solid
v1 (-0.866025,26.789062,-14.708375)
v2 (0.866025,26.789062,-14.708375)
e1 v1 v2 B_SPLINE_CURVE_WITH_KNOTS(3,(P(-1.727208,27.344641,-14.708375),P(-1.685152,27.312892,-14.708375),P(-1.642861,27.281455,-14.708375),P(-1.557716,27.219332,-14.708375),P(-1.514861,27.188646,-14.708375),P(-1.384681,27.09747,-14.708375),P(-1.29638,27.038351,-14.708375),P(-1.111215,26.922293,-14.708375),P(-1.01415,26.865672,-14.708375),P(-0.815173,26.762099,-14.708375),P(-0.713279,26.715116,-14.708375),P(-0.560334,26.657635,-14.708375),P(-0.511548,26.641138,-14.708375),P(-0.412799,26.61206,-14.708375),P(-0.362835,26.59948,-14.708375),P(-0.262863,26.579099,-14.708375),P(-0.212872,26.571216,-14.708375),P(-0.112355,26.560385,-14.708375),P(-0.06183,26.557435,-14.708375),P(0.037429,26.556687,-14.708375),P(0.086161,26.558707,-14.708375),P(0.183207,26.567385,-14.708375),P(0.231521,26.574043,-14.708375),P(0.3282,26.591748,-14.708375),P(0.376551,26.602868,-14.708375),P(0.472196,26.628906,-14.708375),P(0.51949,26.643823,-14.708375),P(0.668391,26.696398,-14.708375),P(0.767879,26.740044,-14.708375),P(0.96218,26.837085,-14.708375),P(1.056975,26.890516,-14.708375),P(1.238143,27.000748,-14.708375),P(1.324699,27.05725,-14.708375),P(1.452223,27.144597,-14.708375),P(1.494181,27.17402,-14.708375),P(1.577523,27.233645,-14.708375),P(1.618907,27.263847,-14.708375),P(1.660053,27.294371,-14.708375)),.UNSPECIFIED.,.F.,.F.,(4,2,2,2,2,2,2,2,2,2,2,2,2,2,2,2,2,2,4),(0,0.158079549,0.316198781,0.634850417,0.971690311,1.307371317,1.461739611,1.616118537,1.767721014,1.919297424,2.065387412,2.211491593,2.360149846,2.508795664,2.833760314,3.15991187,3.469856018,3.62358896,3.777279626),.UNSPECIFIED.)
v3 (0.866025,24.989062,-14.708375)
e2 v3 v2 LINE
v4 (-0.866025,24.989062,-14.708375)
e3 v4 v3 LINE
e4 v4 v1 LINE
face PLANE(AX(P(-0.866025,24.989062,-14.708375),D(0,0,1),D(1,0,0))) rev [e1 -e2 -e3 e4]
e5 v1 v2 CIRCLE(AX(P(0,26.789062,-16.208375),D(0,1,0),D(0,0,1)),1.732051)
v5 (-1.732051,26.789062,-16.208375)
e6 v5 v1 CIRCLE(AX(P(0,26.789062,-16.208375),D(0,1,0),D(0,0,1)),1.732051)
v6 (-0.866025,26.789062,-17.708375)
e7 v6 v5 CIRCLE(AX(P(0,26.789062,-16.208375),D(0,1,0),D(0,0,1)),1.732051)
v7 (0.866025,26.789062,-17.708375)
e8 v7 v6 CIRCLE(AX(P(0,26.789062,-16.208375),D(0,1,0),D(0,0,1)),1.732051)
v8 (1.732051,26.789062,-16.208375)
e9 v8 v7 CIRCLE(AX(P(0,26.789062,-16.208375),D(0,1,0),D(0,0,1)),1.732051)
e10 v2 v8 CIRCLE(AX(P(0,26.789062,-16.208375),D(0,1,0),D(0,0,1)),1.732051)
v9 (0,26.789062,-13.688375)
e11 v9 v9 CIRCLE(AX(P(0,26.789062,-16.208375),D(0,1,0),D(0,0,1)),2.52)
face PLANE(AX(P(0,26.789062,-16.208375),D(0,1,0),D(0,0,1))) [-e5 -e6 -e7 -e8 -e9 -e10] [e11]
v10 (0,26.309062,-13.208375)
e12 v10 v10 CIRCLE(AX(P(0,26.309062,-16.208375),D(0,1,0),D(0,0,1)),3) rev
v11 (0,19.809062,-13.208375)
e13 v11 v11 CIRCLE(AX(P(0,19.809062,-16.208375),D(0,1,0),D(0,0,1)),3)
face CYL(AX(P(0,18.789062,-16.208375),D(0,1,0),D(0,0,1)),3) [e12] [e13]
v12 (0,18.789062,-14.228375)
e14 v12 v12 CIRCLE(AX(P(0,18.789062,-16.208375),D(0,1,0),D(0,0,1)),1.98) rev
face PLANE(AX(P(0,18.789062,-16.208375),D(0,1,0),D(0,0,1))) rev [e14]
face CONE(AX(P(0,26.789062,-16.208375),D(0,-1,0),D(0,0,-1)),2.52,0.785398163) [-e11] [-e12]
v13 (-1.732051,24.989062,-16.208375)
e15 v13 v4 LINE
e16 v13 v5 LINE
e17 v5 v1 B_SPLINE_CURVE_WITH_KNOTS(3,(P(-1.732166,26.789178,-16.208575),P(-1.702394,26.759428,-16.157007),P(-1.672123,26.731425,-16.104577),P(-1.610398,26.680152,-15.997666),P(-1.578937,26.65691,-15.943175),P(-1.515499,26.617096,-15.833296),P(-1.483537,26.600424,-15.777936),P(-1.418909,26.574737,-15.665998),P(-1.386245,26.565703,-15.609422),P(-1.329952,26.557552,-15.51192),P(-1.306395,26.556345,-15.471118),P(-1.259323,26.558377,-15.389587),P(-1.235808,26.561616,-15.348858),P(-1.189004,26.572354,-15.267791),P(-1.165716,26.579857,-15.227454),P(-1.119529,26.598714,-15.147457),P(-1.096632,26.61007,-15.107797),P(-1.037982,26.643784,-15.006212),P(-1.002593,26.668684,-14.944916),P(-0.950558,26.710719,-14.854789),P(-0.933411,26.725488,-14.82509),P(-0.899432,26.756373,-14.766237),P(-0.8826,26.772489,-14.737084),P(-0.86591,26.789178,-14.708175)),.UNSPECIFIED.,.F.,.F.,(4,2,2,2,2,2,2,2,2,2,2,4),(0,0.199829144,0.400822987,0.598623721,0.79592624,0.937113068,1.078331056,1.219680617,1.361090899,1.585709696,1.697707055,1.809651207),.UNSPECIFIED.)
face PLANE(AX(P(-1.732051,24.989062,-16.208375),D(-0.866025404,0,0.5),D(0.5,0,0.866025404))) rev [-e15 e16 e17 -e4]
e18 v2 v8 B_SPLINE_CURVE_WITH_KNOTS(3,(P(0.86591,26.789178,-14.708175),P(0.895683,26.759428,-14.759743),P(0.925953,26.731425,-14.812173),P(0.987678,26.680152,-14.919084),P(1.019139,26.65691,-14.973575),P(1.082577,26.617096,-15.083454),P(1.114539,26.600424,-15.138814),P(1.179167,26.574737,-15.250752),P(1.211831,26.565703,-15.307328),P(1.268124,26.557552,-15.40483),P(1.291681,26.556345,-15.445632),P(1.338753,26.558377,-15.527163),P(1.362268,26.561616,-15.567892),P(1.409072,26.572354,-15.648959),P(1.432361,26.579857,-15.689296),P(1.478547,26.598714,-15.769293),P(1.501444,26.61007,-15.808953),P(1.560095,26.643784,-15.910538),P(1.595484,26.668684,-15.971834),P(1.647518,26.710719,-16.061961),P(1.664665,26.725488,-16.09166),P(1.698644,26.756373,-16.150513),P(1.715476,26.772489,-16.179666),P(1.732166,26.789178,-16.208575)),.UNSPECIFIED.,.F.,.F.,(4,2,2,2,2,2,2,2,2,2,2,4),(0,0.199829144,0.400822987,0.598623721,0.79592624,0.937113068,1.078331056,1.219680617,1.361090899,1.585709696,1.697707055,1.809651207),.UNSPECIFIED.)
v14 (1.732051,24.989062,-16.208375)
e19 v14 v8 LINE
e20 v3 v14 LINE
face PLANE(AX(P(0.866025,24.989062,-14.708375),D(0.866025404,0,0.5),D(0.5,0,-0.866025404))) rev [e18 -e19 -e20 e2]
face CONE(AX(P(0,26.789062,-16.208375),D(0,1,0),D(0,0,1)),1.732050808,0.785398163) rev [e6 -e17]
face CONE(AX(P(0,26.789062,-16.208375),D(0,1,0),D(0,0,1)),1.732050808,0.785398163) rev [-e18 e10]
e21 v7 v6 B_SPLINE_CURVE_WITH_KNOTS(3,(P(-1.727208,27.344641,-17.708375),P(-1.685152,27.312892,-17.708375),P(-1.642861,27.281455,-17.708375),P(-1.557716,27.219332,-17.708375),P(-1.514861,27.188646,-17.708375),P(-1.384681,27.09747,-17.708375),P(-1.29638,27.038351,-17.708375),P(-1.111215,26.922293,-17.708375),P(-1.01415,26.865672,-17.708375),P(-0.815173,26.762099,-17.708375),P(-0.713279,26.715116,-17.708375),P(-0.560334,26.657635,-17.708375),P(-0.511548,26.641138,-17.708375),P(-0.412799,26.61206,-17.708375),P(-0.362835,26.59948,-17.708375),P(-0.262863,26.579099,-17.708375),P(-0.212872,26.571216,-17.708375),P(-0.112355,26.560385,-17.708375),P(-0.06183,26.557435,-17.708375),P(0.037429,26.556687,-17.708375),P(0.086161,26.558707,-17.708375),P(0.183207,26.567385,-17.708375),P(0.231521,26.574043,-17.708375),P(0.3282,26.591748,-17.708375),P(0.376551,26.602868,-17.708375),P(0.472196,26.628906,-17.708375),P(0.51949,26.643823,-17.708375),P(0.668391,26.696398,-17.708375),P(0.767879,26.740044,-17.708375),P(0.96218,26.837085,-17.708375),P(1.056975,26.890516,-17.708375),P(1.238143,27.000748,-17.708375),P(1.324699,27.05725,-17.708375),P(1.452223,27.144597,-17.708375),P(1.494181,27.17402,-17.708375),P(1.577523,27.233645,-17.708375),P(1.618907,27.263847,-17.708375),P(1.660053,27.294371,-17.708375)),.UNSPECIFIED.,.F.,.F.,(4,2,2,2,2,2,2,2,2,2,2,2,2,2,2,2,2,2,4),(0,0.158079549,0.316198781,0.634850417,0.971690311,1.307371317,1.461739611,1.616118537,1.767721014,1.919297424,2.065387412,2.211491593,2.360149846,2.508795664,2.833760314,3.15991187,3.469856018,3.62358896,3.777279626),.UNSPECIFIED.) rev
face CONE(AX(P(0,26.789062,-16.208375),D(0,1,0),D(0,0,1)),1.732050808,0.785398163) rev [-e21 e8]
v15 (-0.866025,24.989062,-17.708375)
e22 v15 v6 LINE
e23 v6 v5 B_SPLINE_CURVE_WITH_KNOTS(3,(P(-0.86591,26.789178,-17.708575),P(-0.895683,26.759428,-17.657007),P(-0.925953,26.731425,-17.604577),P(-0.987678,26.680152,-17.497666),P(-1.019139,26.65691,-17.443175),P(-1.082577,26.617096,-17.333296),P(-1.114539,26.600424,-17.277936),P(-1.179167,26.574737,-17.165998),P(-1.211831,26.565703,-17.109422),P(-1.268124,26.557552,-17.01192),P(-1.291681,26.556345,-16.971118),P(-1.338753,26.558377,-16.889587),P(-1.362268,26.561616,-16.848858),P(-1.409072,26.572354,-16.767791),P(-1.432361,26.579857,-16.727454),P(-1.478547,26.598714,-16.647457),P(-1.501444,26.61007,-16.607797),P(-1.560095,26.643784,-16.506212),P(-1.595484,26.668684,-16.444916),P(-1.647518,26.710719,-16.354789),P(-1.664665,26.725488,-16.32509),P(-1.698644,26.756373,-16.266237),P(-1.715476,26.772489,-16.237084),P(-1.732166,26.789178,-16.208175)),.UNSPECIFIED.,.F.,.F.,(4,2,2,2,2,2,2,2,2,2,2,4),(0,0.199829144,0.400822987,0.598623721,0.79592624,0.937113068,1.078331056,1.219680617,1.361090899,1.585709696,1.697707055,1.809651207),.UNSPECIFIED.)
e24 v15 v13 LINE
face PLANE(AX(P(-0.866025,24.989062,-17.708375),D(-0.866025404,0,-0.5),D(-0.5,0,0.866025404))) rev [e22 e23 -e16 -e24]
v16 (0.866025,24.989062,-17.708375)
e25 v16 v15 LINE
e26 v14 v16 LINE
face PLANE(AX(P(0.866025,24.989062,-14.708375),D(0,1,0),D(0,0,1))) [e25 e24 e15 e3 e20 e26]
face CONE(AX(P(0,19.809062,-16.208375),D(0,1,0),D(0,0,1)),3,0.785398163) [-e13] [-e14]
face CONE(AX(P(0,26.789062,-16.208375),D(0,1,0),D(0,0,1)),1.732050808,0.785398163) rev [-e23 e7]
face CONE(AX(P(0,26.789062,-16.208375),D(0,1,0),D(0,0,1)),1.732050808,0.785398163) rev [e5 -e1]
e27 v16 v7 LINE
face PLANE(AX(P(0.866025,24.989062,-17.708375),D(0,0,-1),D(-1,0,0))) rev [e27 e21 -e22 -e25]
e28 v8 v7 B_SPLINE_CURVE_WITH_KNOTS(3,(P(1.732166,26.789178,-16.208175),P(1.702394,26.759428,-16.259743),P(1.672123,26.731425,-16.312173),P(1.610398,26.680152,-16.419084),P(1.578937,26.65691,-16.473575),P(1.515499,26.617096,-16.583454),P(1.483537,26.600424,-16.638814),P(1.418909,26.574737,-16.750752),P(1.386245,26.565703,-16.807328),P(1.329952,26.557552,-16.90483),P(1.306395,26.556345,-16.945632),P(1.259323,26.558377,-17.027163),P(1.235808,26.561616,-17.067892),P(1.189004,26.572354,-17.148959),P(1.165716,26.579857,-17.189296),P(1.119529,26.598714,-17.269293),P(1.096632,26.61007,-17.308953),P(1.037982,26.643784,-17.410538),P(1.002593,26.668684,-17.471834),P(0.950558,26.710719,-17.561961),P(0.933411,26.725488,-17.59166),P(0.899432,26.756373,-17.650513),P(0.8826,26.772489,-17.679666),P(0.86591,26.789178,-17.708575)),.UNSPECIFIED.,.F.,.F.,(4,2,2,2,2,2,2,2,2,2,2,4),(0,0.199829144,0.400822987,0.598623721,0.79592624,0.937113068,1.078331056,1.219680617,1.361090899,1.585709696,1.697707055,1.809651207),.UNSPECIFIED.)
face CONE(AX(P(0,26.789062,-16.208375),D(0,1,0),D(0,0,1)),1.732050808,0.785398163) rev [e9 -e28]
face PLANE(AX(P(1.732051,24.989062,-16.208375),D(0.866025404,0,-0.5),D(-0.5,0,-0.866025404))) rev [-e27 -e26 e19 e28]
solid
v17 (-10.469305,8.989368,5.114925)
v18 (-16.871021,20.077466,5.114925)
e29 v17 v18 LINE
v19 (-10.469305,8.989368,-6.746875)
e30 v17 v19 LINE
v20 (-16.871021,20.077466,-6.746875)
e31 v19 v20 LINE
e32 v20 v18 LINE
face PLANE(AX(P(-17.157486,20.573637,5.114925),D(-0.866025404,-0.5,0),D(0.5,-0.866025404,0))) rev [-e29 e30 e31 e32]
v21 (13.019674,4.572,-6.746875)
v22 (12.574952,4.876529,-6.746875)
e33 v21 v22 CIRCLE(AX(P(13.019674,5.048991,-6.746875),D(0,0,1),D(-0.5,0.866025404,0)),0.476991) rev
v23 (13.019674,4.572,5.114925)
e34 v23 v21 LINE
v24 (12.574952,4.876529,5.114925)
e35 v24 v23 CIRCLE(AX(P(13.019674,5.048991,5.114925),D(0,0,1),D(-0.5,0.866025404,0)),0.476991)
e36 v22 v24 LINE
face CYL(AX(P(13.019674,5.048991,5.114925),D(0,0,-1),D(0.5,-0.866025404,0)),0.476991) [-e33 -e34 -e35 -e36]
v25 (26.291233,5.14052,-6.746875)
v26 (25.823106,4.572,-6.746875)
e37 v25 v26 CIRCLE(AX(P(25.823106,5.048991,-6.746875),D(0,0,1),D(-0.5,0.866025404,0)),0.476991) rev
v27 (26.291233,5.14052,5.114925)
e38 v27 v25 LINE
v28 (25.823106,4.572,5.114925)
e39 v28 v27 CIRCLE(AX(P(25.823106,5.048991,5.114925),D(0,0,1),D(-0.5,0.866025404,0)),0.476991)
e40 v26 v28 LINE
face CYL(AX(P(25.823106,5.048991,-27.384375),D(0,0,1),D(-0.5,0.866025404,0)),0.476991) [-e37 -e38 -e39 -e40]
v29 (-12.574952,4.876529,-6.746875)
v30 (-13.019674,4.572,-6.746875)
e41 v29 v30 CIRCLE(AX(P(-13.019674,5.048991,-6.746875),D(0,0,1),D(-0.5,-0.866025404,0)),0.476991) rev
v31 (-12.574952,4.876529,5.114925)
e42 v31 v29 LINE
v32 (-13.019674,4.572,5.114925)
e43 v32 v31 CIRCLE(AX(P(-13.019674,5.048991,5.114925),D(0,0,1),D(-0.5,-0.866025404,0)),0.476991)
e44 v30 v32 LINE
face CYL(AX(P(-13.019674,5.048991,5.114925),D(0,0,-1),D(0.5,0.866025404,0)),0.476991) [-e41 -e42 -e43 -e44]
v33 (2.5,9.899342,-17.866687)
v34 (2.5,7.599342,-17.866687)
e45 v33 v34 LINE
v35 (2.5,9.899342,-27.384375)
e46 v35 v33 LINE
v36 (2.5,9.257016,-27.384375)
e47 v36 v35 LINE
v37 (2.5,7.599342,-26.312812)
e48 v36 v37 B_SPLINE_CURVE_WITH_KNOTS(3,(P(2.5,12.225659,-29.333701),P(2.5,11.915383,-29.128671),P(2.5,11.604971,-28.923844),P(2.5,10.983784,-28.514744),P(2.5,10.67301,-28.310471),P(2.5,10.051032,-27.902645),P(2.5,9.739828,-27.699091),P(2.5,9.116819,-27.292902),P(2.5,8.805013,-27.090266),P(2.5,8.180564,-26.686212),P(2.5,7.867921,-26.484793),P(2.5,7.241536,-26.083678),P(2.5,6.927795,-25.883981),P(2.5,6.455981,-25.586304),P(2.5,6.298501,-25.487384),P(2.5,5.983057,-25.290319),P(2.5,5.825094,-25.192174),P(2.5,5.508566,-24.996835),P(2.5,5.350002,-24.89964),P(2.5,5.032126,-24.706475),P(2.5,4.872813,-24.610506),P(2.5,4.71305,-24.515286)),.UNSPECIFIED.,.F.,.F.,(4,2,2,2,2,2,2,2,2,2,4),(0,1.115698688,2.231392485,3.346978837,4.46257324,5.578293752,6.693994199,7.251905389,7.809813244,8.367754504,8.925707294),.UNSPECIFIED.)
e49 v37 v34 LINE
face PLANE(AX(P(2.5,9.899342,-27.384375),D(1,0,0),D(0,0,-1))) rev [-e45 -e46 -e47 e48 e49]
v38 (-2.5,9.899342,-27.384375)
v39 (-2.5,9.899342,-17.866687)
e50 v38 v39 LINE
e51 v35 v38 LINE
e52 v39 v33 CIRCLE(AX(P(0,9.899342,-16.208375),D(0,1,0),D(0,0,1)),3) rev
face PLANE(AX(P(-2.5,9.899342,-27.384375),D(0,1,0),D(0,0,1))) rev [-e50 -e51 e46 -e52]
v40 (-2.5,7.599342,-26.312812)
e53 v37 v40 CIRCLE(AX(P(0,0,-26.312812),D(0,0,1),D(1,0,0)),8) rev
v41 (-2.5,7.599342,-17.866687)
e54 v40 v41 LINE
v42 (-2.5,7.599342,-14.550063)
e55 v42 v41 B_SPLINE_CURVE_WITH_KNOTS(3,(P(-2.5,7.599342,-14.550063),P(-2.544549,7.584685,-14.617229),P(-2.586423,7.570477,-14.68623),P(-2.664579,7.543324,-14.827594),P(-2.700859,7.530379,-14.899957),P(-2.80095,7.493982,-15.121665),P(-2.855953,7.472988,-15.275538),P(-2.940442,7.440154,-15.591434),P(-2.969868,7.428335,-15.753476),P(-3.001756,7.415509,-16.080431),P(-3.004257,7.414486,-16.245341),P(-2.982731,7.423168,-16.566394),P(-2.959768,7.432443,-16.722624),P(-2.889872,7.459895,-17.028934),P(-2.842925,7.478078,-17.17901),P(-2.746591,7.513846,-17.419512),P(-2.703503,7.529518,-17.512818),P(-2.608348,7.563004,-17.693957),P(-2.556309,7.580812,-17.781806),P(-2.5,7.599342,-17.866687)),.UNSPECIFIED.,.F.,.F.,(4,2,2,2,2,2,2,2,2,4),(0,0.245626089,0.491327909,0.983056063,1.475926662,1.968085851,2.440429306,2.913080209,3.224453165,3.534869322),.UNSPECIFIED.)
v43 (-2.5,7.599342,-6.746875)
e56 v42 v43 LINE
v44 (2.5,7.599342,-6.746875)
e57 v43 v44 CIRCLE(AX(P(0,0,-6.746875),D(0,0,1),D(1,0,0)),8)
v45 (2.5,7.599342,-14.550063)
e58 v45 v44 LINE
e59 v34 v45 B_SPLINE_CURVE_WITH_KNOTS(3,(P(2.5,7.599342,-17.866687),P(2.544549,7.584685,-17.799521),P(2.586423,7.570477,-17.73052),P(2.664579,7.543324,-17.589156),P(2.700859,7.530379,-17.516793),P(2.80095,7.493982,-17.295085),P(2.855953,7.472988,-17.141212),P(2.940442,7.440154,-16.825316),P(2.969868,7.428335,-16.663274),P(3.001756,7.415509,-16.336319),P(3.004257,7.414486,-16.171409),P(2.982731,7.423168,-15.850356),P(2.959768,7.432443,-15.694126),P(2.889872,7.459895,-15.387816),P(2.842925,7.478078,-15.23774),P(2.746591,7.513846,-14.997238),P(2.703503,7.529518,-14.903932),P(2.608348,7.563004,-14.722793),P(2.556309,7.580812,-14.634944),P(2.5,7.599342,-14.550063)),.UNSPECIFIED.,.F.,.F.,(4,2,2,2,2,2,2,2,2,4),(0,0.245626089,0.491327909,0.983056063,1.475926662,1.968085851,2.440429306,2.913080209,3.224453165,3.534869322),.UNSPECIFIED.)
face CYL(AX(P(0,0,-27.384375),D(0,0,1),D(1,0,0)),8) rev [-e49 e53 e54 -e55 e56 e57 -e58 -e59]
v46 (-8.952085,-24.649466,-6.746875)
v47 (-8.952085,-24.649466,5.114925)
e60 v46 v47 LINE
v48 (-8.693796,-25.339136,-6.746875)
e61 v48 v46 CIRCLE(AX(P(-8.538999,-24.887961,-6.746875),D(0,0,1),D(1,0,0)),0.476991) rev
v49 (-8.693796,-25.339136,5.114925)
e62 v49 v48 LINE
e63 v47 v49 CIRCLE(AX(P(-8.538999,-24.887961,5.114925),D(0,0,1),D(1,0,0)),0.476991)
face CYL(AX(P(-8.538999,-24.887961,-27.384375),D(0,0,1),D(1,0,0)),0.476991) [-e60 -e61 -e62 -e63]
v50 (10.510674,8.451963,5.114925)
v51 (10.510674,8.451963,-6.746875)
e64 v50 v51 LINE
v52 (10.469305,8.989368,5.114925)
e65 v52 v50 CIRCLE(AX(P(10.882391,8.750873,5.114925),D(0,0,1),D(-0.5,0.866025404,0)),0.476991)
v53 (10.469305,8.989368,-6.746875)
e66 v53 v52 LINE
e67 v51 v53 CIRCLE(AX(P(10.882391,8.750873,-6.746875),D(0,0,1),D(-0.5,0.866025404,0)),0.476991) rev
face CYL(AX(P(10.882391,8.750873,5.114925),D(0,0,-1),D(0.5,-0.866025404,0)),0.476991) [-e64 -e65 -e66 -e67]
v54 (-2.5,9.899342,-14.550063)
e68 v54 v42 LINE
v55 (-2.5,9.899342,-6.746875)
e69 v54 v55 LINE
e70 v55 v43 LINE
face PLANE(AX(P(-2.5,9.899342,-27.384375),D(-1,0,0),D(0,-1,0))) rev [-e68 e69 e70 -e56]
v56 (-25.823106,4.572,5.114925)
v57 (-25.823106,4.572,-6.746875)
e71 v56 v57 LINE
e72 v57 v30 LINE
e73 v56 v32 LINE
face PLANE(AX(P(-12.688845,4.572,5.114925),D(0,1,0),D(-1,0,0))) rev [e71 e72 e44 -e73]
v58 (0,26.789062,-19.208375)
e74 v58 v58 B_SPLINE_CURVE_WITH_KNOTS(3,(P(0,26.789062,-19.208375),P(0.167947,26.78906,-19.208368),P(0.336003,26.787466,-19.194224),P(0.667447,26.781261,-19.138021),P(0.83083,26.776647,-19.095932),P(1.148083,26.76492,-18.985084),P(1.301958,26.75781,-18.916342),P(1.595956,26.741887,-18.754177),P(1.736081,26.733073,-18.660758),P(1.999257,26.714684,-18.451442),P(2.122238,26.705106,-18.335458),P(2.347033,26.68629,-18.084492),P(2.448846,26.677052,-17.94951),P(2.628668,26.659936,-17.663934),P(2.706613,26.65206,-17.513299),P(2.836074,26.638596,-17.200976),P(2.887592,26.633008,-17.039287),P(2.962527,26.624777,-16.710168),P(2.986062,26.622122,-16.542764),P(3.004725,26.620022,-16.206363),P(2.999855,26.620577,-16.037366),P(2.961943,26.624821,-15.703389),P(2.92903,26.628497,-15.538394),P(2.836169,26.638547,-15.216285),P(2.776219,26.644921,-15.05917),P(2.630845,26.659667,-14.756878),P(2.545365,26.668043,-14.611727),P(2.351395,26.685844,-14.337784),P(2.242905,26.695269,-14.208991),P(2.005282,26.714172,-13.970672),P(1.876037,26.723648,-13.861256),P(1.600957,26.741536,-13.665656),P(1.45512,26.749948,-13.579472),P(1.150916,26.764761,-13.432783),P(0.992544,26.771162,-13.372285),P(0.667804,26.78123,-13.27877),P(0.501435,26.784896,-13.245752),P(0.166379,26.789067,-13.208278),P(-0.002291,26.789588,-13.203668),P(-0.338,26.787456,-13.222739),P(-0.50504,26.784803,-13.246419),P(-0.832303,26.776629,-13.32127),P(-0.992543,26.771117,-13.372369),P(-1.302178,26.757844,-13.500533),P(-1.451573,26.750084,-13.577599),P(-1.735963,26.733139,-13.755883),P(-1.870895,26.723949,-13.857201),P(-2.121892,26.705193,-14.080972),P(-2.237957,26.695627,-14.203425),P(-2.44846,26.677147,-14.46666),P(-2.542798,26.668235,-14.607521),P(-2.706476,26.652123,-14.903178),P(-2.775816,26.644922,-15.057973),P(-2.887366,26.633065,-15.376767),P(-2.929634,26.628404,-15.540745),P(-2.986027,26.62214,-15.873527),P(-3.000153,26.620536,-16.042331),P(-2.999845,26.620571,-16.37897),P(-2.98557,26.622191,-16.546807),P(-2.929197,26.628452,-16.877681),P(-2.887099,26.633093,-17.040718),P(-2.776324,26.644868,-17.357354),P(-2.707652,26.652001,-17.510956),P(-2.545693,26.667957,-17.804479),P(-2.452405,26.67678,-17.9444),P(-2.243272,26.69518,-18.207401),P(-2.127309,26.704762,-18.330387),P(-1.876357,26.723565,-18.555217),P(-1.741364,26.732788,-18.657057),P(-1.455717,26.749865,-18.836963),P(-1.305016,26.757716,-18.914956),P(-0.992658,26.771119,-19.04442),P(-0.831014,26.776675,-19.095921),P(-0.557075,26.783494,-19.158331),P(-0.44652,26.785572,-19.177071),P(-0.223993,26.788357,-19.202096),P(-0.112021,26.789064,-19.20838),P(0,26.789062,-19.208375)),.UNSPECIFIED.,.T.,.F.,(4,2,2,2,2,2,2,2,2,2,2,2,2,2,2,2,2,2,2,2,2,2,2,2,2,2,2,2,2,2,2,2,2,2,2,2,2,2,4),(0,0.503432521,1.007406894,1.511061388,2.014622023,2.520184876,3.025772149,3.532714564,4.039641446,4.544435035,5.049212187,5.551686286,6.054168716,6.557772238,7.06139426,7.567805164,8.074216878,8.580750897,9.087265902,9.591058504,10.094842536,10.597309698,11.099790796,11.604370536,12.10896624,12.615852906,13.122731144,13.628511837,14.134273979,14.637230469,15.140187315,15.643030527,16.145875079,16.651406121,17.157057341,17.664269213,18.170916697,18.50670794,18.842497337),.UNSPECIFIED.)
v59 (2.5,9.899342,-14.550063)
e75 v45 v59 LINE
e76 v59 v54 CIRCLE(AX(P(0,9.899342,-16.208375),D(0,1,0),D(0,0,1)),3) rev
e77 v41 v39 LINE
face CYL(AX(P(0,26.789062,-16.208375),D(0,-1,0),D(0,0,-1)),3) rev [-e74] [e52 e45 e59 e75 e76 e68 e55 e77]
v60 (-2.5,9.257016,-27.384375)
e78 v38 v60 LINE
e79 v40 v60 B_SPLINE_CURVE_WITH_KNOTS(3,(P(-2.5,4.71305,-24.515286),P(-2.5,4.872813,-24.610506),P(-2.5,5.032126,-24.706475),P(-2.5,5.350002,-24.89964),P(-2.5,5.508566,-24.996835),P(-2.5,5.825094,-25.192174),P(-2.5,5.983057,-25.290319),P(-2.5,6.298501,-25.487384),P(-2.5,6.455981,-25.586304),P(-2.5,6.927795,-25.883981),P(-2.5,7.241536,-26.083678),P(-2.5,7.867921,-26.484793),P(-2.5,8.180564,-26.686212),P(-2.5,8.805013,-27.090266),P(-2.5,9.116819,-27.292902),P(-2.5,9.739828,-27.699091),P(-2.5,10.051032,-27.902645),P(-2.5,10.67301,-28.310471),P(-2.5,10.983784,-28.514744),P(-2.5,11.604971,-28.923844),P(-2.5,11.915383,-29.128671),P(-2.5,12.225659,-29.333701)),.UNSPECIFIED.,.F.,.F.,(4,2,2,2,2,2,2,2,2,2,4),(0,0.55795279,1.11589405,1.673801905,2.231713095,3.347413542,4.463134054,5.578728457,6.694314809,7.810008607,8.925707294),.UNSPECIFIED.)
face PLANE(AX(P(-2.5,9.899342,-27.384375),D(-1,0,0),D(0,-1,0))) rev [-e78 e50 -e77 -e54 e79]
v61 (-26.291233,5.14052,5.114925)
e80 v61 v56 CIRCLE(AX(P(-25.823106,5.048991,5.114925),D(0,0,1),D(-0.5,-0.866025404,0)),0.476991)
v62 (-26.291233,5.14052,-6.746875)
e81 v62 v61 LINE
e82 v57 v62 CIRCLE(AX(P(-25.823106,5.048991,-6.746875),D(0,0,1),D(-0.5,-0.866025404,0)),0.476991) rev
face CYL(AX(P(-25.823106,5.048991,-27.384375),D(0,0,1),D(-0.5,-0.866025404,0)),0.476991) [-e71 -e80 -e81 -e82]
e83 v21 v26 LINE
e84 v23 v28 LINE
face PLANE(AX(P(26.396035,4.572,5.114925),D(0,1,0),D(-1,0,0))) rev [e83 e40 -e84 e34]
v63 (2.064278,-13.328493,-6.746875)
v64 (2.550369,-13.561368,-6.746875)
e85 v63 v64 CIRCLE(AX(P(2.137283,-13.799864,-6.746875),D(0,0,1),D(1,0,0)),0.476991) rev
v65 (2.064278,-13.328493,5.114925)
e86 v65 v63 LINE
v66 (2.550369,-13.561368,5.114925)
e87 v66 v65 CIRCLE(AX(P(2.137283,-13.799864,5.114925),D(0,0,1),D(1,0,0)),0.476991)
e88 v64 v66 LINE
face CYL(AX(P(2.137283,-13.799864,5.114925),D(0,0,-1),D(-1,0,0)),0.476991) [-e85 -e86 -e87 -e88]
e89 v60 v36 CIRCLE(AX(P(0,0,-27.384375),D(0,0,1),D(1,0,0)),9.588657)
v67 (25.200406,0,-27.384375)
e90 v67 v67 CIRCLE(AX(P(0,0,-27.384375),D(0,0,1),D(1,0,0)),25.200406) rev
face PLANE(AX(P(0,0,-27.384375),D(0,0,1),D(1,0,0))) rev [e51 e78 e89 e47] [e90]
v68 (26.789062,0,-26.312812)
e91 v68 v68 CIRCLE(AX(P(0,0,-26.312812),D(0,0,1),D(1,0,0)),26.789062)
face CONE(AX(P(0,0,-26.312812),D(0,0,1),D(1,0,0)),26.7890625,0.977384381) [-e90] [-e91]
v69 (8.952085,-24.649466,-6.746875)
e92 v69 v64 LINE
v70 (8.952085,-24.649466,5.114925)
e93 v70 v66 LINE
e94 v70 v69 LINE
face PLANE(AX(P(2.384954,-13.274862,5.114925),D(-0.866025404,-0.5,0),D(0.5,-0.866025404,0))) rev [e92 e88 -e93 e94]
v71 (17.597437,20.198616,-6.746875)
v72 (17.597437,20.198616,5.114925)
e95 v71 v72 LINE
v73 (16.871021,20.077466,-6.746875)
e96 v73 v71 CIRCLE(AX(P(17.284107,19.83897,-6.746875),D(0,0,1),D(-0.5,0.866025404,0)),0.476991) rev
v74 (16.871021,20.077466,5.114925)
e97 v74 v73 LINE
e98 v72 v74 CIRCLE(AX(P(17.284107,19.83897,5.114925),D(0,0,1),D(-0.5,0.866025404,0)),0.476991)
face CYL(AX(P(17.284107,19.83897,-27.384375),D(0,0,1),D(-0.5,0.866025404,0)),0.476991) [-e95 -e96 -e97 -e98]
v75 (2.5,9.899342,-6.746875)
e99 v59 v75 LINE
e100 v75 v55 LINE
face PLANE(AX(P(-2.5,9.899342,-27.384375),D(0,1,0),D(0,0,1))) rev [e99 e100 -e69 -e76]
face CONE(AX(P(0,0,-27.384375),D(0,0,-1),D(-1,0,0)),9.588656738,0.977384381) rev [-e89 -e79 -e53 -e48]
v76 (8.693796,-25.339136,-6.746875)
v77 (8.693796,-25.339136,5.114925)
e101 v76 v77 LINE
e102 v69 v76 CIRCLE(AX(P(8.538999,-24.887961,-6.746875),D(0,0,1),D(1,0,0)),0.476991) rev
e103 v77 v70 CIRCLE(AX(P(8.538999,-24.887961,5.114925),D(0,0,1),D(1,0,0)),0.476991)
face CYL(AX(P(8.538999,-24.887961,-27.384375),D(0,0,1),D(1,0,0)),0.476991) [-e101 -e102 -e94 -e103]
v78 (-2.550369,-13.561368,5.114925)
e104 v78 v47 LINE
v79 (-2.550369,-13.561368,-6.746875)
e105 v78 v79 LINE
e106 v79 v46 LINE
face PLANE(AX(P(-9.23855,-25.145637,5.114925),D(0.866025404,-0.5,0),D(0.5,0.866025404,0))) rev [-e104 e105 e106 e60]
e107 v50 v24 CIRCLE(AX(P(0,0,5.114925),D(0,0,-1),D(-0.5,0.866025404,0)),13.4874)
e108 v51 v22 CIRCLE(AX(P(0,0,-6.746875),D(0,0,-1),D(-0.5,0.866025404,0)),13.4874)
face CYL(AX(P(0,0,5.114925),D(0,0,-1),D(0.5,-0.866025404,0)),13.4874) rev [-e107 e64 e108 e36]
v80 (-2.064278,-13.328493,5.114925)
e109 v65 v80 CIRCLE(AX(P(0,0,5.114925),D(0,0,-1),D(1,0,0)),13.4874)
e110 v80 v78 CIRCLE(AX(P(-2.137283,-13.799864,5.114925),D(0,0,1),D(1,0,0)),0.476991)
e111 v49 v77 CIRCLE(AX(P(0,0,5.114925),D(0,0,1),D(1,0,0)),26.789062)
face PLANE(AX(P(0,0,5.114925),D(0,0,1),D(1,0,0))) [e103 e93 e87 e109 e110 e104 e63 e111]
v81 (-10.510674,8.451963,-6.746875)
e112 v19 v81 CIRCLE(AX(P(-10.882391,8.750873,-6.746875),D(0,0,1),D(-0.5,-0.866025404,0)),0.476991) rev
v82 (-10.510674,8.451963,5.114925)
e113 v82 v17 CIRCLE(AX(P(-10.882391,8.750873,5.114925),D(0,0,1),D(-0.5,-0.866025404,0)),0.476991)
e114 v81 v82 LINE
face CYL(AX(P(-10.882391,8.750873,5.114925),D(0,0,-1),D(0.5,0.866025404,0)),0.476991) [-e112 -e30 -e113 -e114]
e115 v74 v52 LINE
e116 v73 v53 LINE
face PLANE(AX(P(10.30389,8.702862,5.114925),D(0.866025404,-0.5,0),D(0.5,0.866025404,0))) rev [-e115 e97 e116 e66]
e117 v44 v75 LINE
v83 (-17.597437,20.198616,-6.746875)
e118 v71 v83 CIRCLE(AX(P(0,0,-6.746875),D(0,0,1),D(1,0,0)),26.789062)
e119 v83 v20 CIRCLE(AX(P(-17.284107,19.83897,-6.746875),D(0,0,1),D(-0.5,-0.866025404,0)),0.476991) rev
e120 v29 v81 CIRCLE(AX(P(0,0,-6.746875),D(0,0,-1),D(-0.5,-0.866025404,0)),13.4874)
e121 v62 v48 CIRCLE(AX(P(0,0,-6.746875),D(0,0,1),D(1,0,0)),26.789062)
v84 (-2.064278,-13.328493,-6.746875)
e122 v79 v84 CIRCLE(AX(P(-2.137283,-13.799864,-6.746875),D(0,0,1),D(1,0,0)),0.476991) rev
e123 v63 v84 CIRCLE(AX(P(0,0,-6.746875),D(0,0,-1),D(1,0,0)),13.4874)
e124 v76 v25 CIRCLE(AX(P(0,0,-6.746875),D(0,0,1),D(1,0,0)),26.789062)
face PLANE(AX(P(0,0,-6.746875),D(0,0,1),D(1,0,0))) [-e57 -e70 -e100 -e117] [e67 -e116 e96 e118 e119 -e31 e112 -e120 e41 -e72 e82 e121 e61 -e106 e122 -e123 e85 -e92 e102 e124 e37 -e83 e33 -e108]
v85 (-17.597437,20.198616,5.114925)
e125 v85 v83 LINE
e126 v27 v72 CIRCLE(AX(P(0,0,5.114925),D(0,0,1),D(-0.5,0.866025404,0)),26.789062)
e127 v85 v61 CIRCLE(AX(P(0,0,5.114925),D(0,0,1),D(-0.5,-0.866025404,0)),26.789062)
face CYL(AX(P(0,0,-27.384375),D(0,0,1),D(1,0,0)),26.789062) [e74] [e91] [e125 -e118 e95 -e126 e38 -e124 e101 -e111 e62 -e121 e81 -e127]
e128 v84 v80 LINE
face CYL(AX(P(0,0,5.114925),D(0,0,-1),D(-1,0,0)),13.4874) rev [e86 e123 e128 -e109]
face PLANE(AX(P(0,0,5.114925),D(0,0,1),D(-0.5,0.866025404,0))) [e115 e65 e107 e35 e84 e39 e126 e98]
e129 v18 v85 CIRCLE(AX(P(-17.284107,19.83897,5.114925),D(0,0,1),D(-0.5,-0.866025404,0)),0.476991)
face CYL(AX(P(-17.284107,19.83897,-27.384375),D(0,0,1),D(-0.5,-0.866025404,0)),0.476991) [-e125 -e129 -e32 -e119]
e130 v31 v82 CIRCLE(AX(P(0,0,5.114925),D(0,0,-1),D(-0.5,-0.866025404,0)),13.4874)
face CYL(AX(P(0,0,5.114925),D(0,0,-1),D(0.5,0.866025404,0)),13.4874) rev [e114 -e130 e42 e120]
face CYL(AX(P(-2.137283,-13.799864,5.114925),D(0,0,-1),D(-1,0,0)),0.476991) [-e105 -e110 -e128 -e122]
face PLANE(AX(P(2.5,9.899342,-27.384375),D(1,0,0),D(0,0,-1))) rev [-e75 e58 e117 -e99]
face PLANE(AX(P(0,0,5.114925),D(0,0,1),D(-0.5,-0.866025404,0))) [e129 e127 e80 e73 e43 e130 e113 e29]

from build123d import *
from OCP.BRepFilletAPI import BRepFilletAPI_MakeChamfer

# Parameters (mm, degrees)
BOSS_EXTRUDE1_START      = -6.746875
SKETCH1_R                = 26.7890625
BOSS_EXTRUDE1_DEPTH      = 20.6375
BOSS_EXTRUDE2_DEPTH      = 11.8618
FILLET1_R                = 0.476990821
CIRPATTERN1_COUNT        = 3
FILLET1_OF_CIRPATTERN1_R = 0.476990821
CUT_EXTRUDE5_DEPTH       = 47.746248335
CUT_EXTRUDE5_DEPTH_BACK  = 47.746248335
SKETCH15_R               = 8
CHAMFER1_SIZE            = 1.0715625
CHAMFER1_SIZE2           = 1.588656738
CUT_EXTRUDE1_DEPTH       = 47.746248335
CUT_EXTRUDE1_DEPTH_BACK  = 47.746248335
SKETCH5_R                = 3
CUT_EXTRUDE2_DEPTH       = 47.746248335
SKETCH6_R                = 3
BOSS_EXTRUDE3_DEPTH      = 8
CUT_EXTRUDE3_DEPTH       = 1.8
CHAMFER3_SIZE            = 0.48
CHAMFER4_SIZE            = 1.02


with BuildPart() as part:
    # Sketch1 → Boss-Extrude1 (new body)
    with BuildSketch(Plane.XY.offset(BOSS_EXTRUDE1_START)):
        Circle(SKETCH1_R)
    extrude(amount=-BOSS_EXTRUDE1_DEPTH)

    # Sketch2 → Boss-Extrude2 (add)
    with BuildSketch(Plane.XY.offset(-6.746875)):
        with BuildLine():
            Line((-9.238549561, -25.145637229), (-2.384954104, -13.274861682))
            ThreePointArc((-2.384954104, -13.274861682), (0, -13.4874), (2.384954104, -13.274861682))
            Line((2.384954104, -13.274861682), (9.238549561, -25.145637229))
            ThreePointArc((9.238549561, -25.145637229), (0, -26.7890625), (-9.238549561, -25.145637229))
        make_face()
    boss_extrude2 = extrude(amount=BOSS_EXTRUDE2_DEPTH)

    # Fillet1
    # the kernel refuses this fillet: 0.476990821 mm, written as the material it takes off along each edge
    with BuildSketch(Plane(origin=(-9.238549561, -25.145637229, -6.746875), x_dir=(0.9423194959651416, -0.33471475546202245, 0), z_dir=(0, 0, 1))) as fillet1_piece_1:
        with BuildLine():
            CenterArc((0.572952448, 0.476963054), FILLET1_R, 169.55519331, 101.063030663)
            Line((0.103865366, 0.563435893), (0, 0))
            ThreePointArc((0, 0), (0.28904955, -0.001559444), (0.5780991, 0))
        make_face()
    extrude(amount=13.307047751, mode=Mode.SUBTRACT)
    with BuildSketch(Plane(origin=(9.238549561, -25.145637229, -6.746875), x_dir=(-0.9423194959651411, -0.3347147554620237, 0), z_dir=(0, 0, 1))) as fillet1_piece_2:
        with BuildLine():
            CenterArc((0.572952448, -0.476963054), FILLET1_R, 89.381776027, 101.063030663)
            Line((0.103865366, -0.563435893), (0, 0))
            ThreePointArc((0, 0), (0.28904955, 0.001559444), (0.5780991, 0))
        make_face()
    extrude(amount=13.307047751, mode=Mode.SUBTRACT)
    with BuildSketch(Plane(origin=(2.384954104, -13.274861682, -6.746875), x_dir=(0.49999999999999706, -0.8660254037844404, 0), z_dir=(0, 0, 1))) as fillet1_piece_3:
        with BuildLine():
            CenterArc((0.330829178, -0.476990821), FILLET1_R, 90, 68.803855098)
            ThreePointArc((-0.113892323, -0.304529143), (-0.056028498, -0.152607773), (0, 0))
            Line((0, 0), (0.330829178, 0))
        make_face()
    extrude(amount=12.688872944, mode=Mode.SUBTRACT)
    with BuildSketch(Plane(origin=(-2.384954104, -13.274861682, -6.746875), x_dir=(0.9863015455813384, -0.16495229972286882, 0), z_dir=(0, 0, 1))) as fillet1_piece_4:
        with BuildLine():
            CenterArc((0.330879129, -0.476956172), FILLET1_R, 90.690608377, 68.803855098)
            Line((-0.115888763, -0.309867293), (0, 0))
            ThreePointArc((0, 0), (0.162564956, -0.000979741), (0.325129912, 0))
        make_face()
    extrude(amount=12.688872944, mode=Mode.SUBTRACT)

    # CirPattern1: Boss-Extrude2 ×3 about axis
    cirpattern1_axis = Axis((0, 0, 0), (0, 0, 1))
    for i in range(1, CIRPATTERN1_COUNT):
        add(boss_extrude2.rotate(cirpattern1_axis, i * 360 / CIRPATTERN1_COUNT))

    # Fillet1 of CirPattern1
    # the kernel refuses this fillet: 0.476990821 mm, written as the material it takes off along each edge
    with BuildSketch(Plane(origin=(26.396035415, 4.572, -6.746875), x_dir=(-0.18128826673094764, 0.9834299997181745, 0), z_dir=(0, 0, 1)), Plane(origin=(-17.157485854, 20.573637229, -6.746875), x_dir=(-0.761031229234182, -0.6487152442561451, 0), z_dir=(0, 0, 1))) as fillet1_of_cirpattern1_piece_1:
        with BuildLine():
            CenterArc((0.572952448, 0.476963054), FILLET1_OF_CIRPATTERN1_R, 169.55519331, 101.063030663)
            Line((0.103865366, 0.563435893), (0, 0))
            ThreePointArc((0, 0), (0.28904955, -0.001559444), (0.5780991, 0))
        make_face()
    extrude(amount=13.307047751, mode=Mode.SUBTRACT)
    with BuildSketch(Plane(origin=(17.157485854, 20.573637229, -6.746875), x_dir=(0.7610312292341833, -0.6487152442561435, 0), z_dir=(0, 0, 1)), Plane(origin=(-26.396035415, 4.572, -6.746875), x_dir=(0.181288266730962, 0.9834299997181718, 0), z_dir=(0, 0, 1))) as fillet1_of_cirpattern1_piece_2:
        with BuildLine():
            CenterArc((0.572952448, -0.476963054), FILLET1_OF_CIRPATTERN1_R, 89.381776027, 101.063030663)
            Line((0.103865366, -0.563435893), (0, 0))
            ThreePointArc((0, 0), (0.28904955, 0.001559444), (0.5780991, 0))
        make_face()
    extrude(amount=13.307047751, mode=Mode.SUBTRACT)
    with BuildSketch(Plane(origin=(10.303890396, 8.702861682, -6.746875), x_dir=(0.5000000000000006, 0.8660254037844383, 0), z_dir=(0, 0, 1)), Plane(origin=(-12.688844501, 4.572, -6.746875), x_dir=(-1, 0, 0), z_dir=(0, 0, 1))) as fillet1_of_cirpattern1_piece_3:
        with BuildLine():
            CenterArc((0.330829178, -0.476990821), FILLET1_OF_CIRPATTERN1_R, 90, 68.803855098)
            ThreePointArc((-0.113892323, -0.304529143), (-0.056028498, -0.152607773), (0, 0))
            Line((0, 0), (0.330829178, 0))
        make_face()
    extrude(amount=12.688872944, mode=Mode.SUBTRACT)
    with BuildSketch(Plane(origin=(12.688844501, 4.572, -6.746875), x_dir=(-0.3502978908180006, 0.9366383441267288, 0), z_dir=(0, 0, 1)), Plane(origin=(-10.303890396, 8.702861682, -6.746875), x_dir=(-0.6360036547633316, -0.7716860444038657, 0), z_dir=(0, 0, 1))) as fillet1_of_cirpattern1_piece_4:
        with BuildLine():
            CenterArc((0.330879129, -0.476956172), FILLET1_OF_CIRPATTERN1_R, 90.690608377, 68.803855098)
            Line((-0.115888763, -0.309867293), (0, 0))
            ThreePointArc((0, 0), (0.162564956, -0.000979741), (0.325129912, 0))
        make_face()
    extrude(amount=12.688872944, mode=Mode.SUBTRACT)

    # Sketch15 → Cut-Extrude5 (cut, two sides: drawn at the far end of the back side and taken through both)
    with BuildSketch(Plane.XY.offset(-CUT_EXTRUDE5_DEPTH_BACK)):
        Circle(SKETCH15_R)
    extrude(amount=CUT_EXTRUDE5_DEPTH + CUT_EXTRUDE5_DEPTH_BACK, mode=Mode.SUBTRACT)

    # Chamfer1: one chamfer whose edges measure the first distance from different faces: ONE call of the kernel's chamfer builder (chamfer() names one face for all edges)
    chamfer1_edges_1 = [part.edges().sort_by_distance(p)[0] for p in [
        (-26.7890625, 0, -27.384375),
    ]]
    chamfer1_side_1 = [part.faces().sort_by_distance(p)[0] for p in [
        (-26.7890625, 0, -17.065625),
    ]]
    chamfer1_edges_2 = [part.edges().sort_by_distance(p)[0] for p in [
        (-8, 0, -27.384375),
    ]]
    chamfer1_side_2 = [part.faces().sort_by_distance(p)[0] for p in [
        (-8, 0, -17.065625),
    ]]
    chamfer1 = BRepFilletAPI_MakeChamfer(part.part.solid().wrapped)
    for e in chamfer1_edges_1:
        chamfer1.Add(CHAMFER1_SIZE, CHAMFER1_SIZE2, e.wrapped, chamfer1_side_1[0].wrapped)  # the first distance lies on this face
    for e in chamfer1_edges_2:
        chamfer1.Add(CHAMFER1_SIZE, CHAMFER1_SIZE2, e.wrapped, chamfer1_side_2[0].wrapped)  # the first distance lies on this face
    add(Compound.cast(chamfer1.Shape()), mode=Mode.REPLACE)

    # Sketch4 → Cut-Extrude1 (cut, two sides: drawn at the far end of the back side and taken through both)
    with BuildSketch(Plane.XY.offset(-CUT_EXTRUDE1_DEPTH_BACK)):
        with BuildLine():
            Line((-2.5, 9.899342077), (2.5, 9.899342077))
            Line((2.5, 9.899342077), (2.5, 7.599342077))
            ThreePointArc((2.5, 7.599342077), (0, 8), (-2.5, 7.599342077))
            Line((-2.5, 7.599342077), (-2.5, 9.899342077))
        make_face()
    extrude(amount=CUT_EXTRUDE1_DEPTH + CUT_EXTRUDE1_DEPTH_BACK, mode=Mode.SUBTRACT)

    # Sketch5 → Cut-Extrude2 (cut, through all)
    with BuildSketch(Plane(origin=(0, 0, 0), x_dir=(1, 0, 0), z_dir=(0, 1, 0))):
        with Locations(Location((0, 16.208375, 0), (0, 0, 90))):
            Circle(SKETCH5_R)
    extrude(amount=CUT_EXTRUDE2_DEPTH, mode=Mode.SUBTRACT)


with BuildPart() as body_2:
    # Sketch6 → Boss-Extrude3 (new body)
    with BuildSketch(Plane(origin=(0, 26.7890625, 0), x_dir=(-1, 0, 0), z_dir=(0, 1, 0))):
        with Locations(Location((0, -16.208375, 0), (0, 0, 90))):
            Circle(SKETCH6_R)
    extrude(amount=-BOSS_EXTRUDE3_DEPTH)

    # Sketch8 → Cut-Extrude3 (cut)
    with BuildSketch(Plane(origin=(0, 26.7890625, 0), x_dir=(1, 0, 0), z_dir=(0, 1, 0))):
        Polygon((0.866025404, 14.708375), (1.732050808, 16.208375), (0.866025404, 17.708375), (-0.866025404, 17.708375), (-1.732050808, 16.208375), (-0.866025404, 14.708375), align=None)
    extrude(amount=-CUT_EXTRUDE3_DEPTH, mode=Mode.SUBTRACT)

    # Cut-Extrude4 cone 1 section (through the dimple's axis) → Cut-Extrude4 (revolve, cut)
    with BuildSketch(Plane(origin=(0, 26.7890625, -16.208375), x_dir=(0, 0, 1), z_dir=(1, 0, 0))):
        Polygon((0, 0), (1.732050808, 0), (0, 1.732050808), align=None)
    revolve(axis=Axis((0, 26.7890625, -16.208375), (0, -1, 0)), mode=Mode.SUBTRACT)

    # Chamfer3
    chamfer3_edges = [body_2.edges().sort_by_distance(p)[0] for p in [
        (0, 26.7890625, -19.208375),
    ]]
    chamfer(chamfer3_edges, length=CHAMFER3_SIZE)

    # Chamfer4
    chamfer4_edges = [body_2.edges().sort_by_distance(p)[0] for p in [
        (0, 18.7890625, -19.208375),
    ]]
    chamfer(chamfer4_edges, length=CHAMFER4_SIZE)


solid = Compound([part.part, body_2.part])
